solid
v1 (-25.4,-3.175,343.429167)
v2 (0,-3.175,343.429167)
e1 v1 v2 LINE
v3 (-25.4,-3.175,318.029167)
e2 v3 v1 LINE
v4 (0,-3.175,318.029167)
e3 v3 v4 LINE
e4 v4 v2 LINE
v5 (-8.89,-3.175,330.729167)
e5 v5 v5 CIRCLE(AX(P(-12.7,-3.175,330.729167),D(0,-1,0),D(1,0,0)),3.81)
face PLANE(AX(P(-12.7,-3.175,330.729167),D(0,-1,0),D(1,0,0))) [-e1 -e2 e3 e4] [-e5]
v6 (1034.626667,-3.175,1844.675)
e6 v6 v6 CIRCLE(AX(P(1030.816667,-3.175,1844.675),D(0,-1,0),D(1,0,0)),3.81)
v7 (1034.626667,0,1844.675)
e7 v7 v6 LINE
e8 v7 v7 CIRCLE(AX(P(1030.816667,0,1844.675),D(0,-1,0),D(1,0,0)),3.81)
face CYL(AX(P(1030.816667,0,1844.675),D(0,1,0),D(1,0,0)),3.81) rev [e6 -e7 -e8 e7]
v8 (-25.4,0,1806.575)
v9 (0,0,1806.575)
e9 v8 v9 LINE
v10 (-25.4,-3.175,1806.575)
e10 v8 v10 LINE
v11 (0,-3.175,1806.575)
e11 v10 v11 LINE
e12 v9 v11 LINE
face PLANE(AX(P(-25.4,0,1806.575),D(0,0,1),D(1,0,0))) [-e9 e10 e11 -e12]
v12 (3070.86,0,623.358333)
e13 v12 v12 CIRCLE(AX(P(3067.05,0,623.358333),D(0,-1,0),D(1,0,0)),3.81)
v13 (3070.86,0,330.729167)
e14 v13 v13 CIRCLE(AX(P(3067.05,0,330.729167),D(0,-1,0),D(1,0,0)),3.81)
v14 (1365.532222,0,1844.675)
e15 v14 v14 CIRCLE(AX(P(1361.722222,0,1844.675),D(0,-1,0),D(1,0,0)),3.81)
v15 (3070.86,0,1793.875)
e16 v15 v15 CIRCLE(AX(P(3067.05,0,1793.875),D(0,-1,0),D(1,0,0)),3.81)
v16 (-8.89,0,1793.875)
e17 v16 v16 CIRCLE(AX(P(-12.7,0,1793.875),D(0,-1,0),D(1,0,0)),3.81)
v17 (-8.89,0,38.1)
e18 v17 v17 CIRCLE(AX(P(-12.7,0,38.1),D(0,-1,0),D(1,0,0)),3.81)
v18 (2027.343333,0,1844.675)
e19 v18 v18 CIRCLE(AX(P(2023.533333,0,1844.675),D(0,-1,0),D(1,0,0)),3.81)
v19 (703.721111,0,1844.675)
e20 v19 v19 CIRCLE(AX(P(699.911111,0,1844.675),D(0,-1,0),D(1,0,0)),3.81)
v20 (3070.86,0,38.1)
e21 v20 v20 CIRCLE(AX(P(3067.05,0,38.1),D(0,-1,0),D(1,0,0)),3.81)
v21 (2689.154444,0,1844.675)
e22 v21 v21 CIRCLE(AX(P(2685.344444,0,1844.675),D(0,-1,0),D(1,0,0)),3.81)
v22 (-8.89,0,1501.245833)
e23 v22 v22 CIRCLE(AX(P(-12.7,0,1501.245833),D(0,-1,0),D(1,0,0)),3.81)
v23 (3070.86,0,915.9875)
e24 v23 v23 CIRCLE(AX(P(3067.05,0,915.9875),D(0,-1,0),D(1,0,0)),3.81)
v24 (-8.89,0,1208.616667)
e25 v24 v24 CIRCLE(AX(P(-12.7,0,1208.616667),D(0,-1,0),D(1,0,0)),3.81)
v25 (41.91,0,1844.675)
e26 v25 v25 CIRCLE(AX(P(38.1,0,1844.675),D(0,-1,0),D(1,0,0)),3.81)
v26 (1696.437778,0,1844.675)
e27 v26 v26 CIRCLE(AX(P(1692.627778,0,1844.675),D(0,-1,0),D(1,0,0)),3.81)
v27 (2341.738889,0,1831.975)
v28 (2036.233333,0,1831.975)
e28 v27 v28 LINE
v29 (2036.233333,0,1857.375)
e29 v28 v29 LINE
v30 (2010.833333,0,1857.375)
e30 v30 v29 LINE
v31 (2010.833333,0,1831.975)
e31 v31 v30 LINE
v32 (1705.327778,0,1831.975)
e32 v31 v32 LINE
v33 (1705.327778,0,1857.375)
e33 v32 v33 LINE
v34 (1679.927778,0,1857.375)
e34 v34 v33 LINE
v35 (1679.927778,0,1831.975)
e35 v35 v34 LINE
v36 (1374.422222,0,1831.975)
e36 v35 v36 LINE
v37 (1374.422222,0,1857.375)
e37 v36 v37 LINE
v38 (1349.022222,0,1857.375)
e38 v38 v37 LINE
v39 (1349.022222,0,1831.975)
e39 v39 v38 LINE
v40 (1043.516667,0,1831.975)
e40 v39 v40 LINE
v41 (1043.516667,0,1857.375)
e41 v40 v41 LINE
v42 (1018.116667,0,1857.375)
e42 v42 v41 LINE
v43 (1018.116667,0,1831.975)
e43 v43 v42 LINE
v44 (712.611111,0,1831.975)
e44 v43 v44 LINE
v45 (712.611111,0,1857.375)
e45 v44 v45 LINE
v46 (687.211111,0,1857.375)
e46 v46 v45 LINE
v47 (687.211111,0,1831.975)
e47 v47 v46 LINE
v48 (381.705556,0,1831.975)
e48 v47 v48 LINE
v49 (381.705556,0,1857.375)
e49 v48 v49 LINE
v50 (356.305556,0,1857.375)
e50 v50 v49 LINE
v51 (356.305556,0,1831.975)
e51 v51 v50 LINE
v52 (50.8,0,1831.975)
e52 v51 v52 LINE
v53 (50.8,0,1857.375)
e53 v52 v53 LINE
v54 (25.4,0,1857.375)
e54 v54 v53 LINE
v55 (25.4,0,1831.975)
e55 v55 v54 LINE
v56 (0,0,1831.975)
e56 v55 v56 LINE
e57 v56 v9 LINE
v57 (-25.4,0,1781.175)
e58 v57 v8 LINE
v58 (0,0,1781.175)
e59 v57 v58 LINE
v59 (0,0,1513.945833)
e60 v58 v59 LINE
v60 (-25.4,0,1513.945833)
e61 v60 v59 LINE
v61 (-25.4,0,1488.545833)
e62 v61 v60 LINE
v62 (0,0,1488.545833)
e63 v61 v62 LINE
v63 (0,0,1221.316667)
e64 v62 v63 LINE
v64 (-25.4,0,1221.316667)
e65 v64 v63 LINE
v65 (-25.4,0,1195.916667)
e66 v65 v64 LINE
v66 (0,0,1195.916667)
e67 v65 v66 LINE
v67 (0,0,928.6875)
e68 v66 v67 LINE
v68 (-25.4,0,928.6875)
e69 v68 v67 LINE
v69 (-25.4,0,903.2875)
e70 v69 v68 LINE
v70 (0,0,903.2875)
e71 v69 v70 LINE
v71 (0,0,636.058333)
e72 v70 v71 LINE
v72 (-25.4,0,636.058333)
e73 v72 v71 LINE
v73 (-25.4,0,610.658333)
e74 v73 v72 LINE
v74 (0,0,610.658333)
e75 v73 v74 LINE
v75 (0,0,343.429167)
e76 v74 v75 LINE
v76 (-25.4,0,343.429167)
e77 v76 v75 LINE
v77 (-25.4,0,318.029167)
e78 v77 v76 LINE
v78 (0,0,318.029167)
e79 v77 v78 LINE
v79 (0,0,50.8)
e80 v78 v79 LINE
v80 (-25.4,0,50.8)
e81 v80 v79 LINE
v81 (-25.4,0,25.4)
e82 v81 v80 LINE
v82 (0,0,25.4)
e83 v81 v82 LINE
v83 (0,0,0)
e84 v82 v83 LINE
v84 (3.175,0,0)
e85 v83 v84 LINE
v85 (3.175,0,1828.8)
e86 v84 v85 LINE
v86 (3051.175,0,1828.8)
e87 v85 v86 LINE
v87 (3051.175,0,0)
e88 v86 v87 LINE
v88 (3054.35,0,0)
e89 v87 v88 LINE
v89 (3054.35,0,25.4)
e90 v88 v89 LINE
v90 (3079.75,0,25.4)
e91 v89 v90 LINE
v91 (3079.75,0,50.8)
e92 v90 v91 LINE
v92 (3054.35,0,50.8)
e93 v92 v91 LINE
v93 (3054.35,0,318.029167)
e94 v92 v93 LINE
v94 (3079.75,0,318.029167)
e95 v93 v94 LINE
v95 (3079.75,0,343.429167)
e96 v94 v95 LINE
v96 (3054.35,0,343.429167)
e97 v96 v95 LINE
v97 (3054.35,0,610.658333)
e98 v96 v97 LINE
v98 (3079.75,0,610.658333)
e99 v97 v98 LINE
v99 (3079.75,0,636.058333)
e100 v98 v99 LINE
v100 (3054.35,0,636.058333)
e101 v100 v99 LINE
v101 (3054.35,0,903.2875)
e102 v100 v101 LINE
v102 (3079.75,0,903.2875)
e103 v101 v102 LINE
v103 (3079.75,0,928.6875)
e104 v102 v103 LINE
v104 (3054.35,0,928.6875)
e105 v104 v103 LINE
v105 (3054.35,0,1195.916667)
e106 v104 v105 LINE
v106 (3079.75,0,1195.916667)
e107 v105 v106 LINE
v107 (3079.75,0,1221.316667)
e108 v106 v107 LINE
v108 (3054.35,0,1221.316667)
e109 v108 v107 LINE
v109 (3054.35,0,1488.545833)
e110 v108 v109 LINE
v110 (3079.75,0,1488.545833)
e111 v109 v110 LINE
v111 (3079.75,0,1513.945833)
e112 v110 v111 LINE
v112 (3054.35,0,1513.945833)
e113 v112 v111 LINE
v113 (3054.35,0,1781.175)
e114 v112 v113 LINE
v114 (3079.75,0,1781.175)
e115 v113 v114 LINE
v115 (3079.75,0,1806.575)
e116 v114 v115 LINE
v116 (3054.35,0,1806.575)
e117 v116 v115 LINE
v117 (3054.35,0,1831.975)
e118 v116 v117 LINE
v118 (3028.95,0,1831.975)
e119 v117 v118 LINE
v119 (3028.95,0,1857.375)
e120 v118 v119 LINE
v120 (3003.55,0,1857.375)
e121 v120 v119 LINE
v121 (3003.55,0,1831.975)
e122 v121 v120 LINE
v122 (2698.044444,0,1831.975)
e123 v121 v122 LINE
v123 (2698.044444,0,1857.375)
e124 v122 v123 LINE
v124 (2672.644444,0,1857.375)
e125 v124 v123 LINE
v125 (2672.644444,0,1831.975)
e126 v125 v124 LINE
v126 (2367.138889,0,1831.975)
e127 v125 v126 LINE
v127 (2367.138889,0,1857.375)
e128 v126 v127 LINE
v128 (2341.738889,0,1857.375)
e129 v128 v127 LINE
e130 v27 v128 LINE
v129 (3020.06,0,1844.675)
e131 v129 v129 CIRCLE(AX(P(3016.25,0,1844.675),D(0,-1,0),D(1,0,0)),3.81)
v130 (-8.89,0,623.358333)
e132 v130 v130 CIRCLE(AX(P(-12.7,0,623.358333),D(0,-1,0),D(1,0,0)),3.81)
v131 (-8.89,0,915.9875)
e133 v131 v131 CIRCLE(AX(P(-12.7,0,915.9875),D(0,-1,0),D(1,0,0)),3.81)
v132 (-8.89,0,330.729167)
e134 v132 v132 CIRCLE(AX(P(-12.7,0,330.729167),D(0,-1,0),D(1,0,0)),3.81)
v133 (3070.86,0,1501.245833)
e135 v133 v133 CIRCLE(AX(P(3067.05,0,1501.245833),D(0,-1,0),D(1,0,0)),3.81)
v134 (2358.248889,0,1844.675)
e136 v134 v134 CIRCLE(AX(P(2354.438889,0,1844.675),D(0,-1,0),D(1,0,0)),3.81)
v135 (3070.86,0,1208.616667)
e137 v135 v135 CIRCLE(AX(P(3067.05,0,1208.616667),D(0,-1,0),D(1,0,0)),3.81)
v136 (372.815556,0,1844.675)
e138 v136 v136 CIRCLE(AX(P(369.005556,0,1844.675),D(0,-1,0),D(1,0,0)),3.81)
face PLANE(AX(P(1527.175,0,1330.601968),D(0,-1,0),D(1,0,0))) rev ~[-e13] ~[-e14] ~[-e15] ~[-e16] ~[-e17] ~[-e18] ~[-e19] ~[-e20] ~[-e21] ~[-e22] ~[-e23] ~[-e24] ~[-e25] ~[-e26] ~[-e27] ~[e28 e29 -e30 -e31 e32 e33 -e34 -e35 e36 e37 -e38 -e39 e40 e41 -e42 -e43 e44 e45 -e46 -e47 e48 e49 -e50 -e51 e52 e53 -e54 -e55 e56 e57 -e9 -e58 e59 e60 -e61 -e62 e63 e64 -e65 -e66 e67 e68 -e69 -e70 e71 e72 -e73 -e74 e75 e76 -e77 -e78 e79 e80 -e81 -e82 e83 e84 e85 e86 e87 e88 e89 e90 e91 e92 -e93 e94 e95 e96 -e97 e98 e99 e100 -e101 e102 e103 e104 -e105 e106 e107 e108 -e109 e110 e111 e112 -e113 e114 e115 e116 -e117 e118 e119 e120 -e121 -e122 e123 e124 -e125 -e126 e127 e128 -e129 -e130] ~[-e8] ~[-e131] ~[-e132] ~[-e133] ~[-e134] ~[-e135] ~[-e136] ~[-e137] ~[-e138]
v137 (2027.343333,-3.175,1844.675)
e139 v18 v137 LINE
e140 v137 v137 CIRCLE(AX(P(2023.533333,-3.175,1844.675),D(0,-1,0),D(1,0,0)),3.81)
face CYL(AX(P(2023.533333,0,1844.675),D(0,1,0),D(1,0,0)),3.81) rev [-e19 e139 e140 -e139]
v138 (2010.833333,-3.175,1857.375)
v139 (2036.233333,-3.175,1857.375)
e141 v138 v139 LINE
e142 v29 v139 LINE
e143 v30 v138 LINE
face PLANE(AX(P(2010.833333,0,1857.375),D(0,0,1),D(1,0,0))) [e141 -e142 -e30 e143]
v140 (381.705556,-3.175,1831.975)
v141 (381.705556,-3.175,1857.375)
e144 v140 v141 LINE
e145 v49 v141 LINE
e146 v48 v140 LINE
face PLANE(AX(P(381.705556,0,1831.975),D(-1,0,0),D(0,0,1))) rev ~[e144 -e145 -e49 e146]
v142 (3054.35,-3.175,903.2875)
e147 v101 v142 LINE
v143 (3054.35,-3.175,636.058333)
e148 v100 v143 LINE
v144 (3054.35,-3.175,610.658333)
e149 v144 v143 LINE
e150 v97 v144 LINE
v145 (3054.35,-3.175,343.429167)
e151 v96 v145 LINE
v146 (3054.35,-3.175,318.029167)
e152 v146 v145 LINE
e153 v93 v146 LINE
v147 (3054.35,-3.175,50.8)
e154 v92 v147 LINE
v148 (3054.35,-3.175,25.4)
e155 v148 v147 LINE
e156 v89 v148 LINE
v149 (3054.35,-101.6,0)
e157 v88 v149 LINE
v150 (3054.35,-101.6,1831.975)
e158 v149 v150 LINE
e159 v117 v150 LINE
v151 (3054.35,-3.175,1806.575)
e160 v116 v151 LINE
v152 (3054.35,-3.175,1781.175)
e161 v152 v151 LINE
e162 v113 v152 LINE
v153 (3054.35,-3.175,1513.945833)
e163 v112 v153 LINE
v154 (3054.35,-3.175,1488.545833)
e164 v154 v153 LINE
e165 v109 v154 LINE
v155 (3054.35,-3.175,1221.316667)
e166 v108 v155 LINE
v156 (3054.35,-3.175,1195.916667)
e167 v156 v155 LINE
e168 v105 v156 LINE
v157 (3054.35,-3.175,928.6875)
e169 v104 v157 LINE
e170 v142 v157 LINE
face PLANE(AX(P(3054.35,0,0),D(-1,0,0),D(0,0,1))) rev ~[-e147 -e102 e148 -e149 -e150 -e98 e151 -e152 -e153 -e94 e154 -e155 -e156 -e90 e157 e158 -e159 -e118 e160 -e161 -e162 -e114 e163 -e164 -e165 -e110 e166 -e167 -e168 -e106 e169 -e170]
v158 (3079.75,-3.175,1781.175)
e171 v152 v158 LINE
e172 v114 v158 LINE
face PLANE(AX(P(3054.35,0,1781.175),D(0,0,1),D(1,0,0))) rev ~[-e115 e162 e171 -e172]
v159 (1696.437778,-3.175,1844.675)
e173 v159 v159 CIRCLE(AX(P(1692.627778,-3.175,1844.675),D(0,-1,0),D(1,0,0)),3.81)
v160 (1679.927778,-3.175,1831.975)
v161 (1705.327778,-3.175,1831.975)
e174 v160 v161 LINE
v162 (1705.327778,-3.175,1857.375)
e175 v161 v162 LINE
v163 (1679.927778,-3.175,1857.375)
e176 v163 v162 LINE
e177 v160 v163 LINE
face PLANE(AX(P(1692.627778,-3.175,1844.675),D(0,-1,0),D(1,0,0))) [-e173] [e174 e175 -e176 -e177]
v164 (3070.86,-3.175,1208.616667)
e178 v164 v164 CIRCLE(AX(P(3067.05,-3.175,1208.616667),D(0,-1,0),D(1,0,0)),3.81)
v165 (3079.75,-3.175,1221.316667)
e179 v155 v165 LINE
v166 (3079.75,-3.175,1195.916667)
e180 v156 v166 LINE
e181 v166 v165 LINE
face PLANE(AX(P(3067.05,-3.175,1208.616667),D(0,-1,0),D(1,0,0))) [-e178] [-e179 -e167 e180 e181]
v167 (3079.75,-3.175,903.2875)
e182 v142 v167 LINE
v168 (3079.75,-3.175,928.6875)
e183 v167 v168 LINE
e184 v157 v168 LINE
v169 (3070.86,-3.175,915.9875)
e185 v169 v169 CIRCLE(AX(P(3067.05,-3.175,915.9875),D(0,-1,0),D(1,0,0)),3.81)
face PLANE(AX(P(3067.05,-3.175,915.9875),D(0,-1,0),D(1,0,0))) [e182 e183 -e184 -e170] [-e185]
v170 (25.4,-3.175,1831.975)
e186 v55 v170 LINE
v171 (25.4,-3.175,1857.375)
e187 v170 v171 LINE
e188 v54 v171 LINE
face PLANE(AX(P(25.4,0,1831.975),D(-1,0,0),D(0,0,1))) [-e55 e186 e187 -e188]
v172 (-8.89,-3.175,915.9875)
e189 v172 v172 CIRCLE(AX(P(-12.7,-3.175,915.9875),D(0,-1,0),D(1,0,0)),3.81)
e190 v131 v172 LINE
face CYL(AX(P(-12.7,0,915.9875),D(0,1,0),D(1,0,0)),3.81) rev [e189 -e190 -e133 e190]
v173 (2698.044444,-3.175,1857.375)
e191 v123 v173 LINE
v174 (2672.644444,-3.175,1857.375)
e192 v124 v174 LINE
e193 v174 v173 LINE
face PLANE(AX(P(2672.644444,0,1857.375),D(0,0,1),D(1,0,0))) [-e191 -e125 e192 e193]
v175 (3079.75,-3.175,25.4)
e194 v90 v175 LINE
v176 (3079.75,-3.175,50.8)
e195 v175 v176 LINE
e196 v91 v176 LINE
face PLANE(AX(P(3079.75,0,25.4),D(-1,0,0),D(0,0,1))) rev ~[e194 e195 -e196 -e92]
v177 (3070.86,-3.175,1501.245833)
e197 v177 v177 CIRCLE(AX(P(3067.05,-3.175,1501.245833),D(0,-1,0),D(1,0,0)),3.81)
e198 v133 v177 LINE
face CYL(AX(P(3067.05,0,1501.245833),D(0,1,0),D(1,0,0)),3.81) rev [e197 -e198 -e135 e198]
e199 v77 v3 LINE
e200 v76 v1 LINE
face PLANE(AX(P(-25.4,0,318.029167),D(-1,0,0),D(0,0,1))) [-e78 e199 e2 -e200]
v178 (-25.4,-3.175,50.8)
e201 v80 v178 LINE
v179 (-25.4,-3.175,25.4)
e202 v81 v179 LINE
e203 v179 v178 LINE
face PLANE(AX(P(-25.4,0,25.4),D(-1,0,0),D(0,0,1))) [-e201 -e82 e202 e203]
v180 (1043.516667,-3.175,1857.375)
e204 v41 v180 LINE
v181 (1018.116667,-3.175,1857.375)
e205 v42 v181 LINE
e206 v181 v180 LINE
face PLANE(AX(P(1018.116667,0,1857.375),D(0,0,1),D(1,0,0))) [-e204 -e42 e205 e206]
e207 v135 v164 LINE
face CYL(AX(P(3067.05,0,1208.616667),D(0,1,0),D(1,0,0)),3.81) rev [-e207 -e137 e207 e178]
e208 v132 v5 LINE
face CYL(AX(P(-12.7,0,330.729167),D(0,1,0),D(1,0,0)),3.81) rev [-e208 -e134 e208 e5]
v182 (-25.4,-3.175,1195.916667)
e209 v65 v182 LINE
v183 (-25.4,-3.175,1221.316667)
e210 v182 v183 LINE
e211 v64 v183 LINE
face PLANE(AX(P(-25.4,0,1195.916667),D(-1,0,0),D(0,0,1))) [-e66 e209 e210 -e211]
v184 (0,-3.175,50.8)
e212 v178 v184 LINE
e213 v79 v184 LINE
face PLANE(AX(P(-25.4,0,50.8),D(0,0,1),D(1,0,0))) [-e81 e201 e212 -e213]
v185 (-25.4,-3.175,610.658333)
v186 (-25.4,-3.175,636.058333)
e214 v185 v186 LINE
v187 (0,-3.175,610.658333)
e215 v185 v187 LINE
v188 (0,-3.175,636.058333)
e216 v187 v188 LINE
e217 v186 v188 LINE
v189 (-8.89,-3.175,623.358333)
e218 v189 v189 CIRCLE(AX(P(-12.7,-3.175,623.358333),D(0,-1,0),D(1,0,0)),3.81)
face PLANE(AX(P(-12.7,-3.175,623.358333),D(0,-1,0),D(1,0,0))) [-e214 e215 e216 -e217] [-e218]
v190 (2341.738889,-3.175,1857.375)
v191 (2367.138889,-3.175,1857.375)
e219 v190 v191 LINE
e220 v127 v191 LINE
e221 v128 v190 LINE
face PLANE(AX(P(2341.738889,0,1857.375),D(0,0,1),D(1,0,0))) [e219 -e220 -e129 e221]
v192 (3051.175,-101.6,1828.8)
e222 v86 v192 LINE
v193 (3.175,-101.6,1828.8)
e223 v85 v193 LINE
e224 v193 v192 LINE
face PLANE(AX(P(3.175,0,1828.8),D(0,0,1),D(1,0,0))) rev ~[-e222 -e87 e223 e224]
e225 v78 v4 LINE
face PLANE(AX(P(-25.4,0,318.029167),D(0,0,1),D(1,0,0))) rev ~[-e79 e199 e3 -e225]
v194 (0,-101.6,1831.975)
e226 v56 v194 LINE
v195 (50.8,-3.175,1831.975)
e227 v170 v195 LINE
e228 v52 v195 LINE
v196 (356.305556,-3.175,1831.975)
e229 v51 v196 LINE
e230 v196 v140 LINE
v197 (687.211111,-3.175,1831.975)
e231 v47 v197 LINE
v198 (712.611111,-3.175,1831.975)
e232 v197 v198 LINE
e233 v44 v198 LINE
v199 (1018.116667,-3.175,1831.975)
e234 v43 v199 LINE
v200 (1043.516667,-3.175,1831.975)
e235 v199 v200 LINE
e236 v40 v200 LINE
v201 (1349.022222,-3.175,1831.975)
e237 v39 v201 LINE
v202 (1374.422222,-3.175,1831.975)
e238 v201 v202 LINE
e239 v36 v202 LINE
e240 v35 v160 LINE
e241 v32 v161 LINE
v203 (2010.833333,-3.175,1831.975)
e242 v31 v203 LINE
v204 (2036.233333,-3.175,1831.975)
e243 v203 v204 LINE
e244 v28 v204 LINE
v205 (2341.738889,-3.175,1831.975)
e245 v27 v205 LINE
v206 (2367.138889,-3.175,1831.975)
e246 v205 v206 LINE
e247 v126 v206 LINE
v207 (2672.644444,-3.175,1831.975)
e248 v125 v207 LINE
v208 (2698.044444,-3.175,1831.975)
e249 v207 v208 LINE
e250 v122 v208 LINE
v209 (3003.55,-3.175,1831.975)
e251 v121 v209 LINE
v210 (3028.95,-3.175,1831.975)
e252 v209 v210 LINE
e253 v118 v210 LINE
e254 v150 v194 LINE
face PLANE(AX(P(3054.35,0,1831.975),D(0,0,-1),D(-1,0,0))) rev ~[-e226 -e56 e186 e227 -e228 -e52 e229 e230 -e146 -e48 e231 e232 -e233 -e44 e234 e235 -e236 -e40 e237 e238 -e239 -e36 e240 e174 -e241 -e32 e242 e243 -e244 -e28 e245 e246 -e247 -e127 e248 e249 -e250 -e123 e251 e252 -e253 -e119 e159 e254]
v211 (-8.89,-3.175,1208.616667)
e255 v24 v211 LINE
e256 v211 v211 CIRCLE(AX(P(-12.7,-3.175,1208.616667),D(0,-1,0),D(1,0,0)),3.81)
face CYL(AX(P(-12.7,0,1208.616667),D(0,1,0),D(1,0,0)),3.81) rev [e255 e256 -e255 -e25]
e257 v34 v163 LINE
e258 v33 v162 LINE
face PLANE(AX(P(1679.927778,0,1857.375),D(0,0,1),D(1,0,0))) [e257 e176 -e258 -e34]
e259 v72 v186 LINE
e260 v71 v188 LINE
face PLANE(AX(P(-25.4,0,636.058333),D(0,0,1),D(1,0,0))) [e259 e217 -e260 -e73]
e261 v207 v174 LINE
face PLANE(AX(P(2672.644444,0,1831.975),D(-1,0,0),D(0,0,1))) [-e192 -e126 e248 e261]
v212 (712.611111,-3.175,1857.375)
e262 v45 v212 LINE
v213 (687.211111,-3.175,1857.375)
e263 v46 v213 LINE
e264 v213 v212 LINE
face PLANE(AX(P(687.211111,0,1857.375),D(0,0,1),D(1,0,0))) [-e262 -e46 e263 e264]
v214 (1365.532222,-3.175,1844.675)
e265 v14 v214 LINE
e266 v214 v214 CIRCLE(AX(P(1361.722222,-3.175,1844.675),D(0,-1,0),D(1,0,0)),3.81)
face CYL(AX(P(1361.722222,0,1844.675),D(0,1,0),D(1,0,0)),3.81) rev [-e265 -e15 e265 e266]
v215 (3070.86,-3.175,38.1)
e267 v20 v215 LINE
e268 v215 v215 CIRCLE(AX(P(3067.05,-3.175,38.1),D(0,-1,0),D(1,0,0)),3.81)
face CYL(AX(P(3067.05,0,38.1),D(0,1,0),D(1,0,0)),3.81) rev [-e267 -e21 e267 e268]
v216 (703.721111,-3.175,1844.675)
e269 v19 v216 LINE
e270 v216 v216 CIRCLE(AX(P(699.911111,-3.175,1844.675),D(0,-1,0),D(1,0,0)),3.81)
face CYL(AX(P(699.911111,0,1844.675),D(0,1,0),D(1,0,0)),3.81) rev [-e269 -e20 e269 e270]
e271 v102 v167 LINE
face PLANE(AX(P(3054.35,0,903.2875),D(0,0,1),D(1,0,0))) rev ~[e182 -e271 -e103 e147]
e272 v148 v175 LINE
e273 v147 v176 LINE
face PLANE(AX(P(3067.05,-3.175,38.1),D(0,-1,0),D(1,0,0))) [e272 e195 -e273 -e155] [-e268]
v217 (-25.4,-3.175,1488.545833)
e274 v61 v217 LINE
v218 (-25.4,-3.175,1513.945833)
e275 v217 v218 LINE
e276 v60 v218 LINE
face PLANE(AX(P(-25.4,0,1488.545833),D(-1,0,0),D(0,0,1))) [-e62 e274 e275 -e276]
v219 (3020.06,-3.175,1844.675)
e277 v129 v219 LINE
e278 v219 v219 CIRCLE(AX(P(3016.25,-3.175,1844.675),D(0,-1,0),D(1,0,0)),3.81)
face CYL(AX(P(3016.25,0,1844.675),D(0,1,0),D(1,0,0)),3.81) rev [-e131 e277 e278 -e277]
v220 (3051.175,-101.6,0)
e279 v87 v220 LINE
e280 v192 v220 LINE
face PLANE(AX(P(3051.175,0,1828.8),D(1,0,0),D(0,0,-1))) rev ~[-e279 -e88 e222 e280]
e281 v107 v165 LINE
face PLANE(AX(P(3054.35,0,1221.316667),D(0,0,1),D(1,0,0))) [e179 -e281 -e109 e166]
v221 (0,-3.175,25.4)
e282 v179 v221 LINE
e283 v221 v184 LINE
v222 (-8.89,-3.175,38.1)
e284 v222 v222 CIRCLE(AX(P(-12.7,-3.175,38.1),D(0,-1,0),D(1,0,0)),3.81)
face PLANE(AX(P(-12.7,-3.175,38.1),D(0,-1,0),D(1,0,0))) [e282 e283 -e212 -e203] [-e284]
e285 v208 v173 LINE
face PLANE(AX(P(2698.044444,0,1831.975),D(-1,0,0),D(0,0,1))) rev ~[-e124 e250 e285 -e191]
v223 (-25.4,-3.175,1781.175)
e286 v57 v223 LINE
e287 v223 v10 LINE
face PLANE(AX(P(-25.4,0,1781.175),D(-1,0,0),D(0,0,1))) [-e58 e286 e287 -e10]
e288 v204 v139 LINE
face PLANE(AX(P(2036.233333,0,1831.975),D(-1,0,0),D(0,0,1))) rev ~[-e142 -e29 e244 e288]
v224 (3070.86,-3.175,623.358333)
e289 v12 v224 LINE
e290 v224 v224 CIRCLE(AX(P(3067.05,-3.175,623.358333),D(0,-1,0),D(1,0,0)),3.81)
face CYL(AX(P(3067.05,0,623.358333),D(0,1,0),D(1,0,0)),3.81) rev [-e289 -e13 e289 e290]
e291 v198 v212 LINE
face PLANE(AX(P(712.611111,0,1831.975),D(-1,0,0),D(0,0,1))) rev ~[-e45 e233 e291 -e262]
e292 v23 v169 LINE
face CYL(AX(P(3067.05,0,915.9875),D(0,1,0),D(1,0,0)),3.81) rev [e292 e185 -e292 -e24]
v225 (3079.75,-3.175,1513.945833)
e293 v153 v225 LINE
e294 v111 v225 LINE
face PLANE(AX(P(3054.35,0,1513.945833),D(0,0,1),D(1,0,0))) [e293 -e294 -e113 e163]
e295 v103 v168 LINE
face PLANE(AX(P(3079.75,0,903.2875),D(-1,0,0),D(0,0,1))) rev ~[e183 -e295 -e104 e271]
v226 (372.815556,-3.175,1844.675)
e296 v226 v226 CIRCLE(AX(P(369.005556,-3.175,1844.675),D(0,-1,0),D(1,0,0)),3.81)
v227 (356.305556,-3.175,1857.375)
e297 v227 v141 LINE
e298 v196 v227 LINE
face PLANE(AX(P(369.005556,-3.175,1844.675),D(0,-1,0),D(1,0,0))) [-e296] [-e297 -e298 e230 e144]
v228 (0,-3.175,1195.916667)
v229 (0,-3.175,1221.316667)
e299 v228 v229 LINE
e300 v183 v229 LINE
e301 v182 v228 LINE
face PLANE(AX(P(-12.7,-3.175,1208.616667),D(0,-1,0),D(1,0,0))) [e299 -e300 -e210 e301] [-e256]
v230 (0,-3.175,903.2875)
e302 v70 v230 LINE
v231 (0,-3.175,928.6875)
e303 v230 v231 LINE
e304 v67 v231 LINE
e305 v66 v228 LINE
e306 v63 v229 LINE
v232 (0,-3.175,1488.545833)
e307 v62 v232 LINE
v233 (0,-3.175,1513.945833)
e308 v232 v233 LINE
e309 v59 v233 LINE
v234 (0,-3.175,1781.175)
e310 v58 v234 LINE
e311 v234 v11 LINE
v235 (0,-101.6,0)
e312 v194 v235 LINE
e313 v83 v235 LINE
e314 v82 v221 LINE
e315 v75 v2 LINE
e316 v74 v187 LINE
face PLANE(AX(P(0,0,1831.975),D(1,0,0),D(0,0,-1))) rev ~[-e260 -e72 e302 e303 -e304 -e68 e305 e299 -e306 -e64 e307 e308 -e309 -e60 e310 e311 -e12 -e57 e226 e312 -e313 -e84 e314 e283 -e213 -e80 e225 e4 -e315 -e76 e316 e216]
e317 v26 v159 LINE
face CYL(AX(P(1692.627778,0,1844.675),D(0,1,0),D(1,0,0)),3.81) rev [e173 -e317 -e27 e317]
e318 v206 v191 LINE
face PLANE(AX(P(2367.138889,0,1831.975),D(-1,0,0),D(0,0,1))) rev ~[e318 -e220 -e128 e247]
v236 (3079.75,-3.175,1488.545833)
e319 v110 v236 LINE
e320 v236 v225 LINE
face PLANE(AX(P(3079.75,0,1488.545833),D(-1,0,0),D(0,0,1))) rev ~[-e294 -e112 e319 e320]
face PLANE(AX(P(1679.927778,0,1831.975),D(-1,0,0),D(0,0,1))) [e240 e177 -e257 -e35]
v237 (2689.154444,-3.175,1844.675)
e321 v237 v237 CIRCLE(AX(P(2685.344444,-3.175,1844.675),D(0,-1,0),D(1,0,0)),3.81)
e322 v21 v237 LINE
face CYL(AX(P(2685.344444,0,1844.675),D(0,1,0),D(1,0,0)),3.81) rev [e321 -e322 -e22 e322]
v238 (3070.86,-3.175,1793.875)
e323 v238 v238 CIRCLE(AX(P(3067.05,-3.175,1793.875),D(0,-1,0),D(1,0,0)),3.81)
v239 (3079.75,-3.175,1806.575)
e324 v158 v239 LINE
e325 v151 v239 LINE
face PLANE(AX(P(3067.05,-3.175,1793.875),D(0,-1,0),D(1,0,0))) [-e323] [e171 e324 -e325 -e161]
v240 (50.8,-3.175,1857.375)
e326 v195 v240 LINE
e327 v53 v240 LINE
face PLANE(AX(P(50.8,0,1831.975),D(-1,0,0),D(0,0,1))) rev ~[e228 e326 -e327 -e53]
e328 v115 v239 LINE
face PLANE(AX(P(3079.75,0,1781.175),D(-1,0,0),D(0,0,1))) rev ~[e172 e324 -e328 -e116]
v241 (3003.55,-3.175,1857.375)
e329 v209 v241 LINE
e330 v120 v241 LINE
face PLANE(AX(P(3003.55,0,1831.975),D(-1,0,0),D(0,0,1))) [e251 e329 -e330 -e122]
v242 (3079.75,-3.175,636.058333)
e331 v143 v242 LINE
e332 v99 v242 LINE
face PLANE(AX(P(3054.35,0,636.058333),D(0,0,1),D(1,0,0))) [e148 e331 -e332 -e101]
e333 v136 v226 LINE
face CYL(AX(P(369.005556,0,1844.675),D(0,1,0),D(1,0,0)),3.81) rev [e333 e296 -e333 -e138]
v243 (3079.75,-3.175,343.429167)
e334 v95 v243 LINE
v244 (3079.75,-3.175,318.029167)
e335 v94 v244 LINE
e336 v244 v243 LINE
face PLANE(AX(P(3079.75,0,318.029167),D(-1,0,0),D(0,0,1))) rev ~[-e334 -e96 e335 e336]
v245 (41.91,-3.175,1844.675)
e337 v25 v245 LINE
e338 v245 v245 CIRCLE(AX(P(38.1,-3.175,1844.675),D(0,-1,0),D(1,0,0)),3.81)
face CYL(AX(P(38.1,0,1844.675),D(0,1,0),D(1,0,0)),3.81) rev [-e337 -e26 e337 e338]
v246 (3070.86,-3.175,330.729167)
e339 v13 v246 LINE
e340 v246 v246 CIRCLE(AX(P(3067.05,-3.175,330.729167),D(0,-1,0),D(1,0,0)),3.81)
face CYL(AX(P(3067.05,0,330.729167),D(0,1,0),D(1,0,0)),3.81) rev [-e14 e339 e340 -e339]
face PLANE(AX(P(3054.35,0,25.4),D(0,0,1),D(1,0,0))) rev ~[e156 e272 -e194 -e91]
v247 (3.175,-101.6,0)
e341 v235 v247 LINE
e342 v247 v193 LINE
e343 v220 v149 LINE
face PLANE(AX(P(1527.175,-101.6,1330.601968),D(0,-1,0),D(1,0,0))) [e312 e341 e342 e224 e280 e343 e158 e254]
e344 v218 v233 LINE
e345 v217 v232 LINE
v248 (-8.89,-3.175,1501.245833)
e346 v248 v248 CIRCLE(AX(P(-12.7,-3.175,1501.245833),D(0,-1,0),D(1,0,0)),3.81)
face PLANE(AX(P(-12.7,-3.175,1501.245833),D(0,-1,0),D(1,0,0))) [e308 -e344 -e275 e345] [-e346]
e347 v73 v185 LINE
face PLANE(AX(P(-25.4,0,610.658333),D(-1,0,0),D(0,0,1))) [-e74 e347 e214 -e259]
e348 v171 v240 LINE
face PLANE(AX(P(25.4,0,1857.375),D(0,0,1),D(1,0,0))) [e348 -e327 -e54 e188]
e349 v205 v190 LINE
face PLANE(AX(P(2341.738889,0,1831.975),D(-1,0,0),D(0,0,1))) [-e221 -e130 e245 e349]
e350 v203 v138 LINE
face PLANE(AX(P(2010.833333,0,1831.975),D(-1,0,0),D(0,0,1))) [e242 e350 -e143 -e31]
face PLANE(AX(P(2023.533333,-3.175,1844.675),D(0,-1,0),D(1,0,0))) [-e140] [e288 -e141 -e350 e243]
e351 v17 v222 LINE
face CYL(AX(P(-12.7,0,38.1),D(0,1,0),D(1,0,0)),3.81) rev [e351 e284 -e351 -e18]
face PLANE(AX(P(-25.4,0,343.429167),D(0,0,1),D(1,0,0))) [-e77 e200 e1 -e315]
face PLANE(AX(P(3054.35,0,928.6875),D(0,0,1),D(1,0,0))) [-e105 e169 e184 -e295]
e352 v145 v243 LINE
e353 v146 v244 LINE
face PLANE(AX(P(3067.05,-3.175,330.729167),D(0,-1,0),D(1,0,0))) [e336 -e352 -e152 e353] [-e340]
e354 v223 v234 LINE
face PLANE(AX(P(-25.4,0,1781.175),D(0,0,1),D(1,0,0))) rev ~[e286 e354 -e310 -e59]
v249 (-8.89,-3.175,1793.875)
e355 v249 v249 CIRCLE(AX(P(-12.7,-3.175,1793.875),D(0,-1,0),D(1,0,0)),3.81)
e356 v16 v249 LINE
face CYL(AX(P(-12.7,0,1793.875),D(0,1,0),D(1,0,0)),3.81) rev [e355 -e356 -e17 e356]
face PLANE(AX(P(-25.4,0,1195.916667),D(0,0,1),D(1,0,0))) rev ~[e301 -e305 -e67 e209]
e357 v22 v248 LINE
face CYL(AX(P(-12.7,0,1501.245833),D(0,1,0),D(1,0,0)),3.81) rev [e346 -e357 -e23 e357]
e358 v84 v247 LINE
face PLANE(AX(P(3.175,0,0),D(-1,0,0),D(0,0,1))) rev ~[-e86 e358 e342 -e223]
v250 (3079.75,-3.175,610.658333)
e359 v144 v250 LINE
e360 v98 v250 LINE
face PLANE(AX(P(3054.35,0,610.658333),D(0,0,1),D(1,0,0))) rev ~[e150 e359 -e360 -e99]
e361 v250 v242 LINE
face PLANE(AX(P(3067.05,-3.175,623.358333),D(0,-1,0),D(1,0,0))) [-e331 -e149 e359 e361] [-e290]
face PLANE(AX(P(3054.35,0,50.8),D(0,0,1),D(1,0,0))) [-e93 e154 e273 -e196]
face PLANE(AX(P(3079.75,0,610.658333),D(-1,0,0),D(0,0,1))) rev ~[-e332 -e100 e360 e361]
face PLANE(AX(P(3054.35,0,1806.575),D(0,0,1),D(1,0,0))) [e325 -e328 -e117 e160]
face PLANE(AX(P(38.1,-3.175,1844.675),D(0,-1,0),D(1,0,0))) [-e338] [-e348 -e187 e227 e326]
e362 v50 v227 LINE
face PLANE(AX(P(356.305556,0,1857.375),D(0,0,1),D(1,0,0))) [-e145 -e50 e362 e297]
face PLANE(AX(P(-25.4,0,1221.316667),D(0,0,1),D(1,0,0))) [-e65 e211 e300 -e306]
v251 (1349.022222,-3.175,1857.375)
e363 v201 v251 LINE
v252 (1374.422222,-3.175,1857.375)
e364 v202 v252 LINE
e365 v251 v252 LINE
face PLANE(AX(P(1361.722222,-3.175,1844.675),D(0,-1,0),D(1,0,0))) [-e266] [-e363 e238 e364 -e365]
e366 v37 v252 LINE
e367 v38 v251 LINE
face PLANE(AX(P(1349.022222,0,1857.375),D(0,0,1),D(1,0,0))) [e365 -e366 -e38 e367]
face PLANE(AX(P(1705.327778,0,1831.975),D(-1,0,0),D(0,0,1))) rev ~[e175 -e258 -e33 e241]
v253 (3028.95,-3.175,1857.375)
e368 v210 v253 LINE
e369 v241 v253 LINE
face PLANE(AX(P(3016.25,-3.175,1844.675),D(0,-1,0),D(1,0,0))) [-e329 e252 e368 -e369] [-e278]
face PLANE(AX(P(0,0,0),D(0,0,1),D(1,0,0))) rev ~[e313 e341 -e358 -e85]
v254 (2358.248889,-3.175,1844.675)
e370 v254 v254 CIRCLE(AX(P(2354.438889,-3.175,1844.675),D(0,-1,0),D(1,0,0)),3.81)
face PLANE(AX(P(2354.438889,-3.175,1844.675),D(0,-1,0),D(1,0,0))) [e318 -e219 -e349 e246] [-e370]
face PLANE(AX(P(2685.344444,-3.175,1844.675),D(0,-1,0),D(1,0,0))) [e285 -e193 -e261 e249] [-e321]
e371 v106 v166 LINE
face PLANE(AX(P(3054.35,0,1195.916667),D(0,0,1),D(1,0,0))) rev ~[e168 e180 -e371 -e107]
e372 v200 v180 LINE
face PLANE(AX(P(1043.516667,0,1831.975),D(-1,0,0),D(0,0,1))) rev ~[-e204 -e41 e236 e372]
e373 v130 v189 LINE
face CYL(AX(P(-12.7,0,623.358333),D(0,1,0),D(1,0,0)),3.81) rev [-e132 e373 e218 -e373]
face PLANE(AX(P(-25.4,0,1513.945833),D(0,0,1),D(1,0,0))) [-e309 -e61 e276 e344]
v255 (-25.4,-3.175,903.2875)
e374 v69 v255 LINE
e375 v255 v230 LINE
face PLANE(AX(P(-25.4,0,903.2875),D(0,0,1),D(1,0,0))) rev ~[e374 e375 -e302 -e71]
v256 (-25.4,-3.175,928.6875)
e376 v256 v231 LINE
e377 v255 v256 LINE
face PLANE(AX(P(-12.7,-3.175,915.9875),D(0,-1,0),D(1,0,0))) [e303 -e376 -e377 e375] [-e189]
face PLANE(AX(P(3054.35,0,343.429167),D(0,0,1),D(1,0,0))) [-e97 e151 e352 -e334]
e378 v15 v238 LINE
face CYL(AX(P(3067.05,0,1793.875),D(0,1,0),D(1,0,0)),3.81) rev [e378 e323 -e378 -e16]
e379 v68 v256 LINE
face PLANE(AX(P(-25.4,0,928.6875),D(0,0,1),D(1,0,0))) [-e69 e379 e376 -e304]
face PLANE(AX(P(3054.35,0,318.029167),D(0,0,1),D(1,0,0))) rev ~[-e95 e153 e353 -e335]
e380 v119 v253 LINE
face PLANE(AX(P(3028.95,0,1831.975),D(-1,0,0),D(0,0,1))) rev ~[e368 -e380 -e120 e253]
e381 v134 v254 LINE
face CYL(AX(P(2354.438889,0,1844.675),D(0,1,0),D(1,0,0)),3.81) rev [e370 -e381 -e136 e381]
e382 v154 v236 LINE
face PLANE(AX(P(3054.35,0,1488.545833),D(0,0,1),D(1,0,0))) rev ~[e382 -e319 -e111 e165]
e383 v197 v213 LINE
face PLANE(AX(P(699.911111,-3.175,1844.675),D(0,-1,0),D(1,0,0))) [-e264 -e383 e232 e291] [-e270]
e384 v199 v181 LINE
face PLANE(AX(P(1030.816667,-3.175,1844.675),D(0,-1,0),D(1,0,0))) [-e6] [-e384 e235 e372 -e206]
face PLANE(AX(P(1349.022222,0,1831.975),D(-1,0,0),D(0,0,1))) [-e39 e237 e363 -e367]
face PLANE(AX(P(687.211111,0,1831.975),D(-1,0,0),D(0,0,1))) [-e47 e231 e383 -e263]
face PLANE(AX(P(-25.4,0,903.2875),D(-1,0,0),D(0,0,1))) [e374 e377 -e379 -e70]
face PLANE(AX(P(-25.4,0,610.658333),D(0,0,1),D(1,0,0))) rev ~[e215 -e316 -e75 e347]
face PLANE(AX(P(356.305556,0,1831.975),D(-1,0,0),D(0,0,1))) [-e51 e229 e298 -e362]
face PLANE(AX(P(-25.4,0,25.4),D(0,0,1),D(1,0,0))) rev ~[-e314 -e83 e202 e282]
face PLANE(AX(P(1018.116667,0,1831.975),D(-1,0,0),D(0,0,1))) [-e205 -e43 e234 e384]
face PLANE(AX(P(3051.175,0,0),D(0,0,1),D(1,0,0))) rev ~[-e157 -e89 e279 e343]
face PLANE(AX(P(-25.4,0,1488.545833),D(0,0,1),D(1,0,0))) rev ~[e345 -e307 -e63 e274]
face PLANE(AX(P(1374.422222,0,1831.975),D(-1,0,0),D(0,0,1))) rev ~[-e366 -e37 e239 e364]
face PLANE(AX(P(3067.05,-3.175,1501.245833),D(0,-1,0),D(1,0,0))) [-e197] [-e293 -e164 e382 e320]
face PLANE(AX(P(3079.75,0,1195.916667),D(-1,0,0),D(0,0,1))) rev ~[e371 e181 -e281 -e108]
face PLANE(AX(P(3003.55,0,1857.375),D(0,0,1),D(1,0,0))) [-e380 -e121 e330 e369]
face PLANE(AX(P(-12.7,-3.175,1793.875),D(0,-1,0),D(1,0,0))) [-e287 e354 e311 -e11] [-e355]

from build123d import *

# Parameters (mm, degrees)
F1_DEPTH = 101.6
F0_W     = 25.4
F0_H     = 25.4
F0_R     = 3.81
F2_DEPTH = 3.175


# Not quite as in the source:
# - a feature names something its author has since deleted; it is built from what else it names


with BuildPart() as f1:
    # F0 (on Front) → F1 (new body)
    with BuildSketch(Plane.XZ):
        Polygon((0, 25.4), (0, 0), (3.175, 0), (3.175, 1828.8), (3051.175, 1828.8), (3051.175, 0), (3054.35, 0), (3054.35, 25.4), (3054.35, 50.8), (3054.35, 318.0291666667), (3054.35, 343.4291666667), (3054.35, 610.6583333333), (3054.35, 636.0583333333), (3054.35, 903.2875), (3054.35, 928.6875), (3054.35, 1195.9166666667), (3054.35, 1221.3166666667), (3054.35, 1488.5458333333), (3054.35, 1513.9458333333), (3054.35, 1781.175), (3054.35, 1806.575), (3054.35, 1831.975), (3028.95, 1831.975), (3003.55, 1831.975), (2698.0444444444, 1831.975), (2672.6444444444, 1831.975), (2367.1388888889, 1831.975), (2341.7388888889, 1831.975), (2036.2333333333, 1831.975), (2010.8333333333, 1831.975), (1705.3277777778, 1831.975), (1679.9277777778, 1831.975), (1374.4222222222, 1831.975), (1349.0222222222, 1831.975), (1043.5166666667, 1831.975), (1018.1166666667, 1831.975), (712.6111111111, 1831.975), (687.2111111111, 1831.975), (381.7055555556, 1831.975), (356.3055555556, 1831.975), (50.8, 1831.975), (25.4, 1831.975), (0, 1831.975), (0, 1806.575), (0, 1781.175), (0, 1513.9458333333), (0, 1488.5458333333), (0, 1221.3166666667), (0, 1195.9166666667), (0, 928.6875), (0, 903.2875), (0, 636.0583333333), (0, 610.6583333333), (0, 343.4291666667), (0, 318.0291666667), (0, 50.8), align=None)
    extrude(amount=F1_DEPTH)

    # F0 (on Front) → F2 (join)
    with BuildSketch(Plane.XZ):
        with Locations((-12.7, 38.1)):
            Rectangle(F0_W, F0_H)
        with Locations((-12.7, 38.1)):
            Circle(F0_R, mode=Mode.SUBTRACT)
        with Locations((-12.7, 330.7291666667)):
            Rectangle(F0_W, F0_H)
        with Locations((-12.7, 330.7291666667)):
            Circle(F0_R, mode=Mode.SUBTRACT)
        with Locations((-12.7, 623.3583333333)):
            Rectangle(F0_W, F0_H)
        with Locations((-12.7, 623.3583333333)):
            Circle(F0_R, mode=Mode.SUBTRACT)
        with Locations((3067.05, 38.1)):
            Rectangle(F0_W, F0_H)
        with Locations((3067.05, 38.1)):
            Circle(F0_R, mode=Mode.SUBTRACT)
        with Locations((-12.7, 915.9875)):
            Rectangle(F0_W, F0_H)
        with Locations((-12.7, 915.9875)):
            Circle(F0_R, mode=Mode.SUBTRACT)
        with Locations((3067.05, 330.7291666667)):
            Rectangle(F0_W, F0_H)
        with Locations((3067.05, 330.7291666667)):
            Circle(F0_R, mode=Mode.SUBTRACT)
        with Locations((-12.7, 1208.6166666667)):
            Rectangle(F0_W, F0_H)
        with Locations((-12.7, 1208.6166666667)):
            Circle(F0_R, mode=Mode.SUBTRACT)
        with Locations((3067.05, 623.3583333333)):
            Rectangle(F0_W, F0_H)
        with Locations((3067.05, 623.3583333333)):
            Circle(F0_R, mode=Mode.SUBTRACT)
        with Locations((-12.7, 1501.2458333333)):
            Rectangle(F0_W, F0_H)
        with Locations((-12.7, 1501.2458333333)):
            Circle(F0_R, mode=Mode.SUBTRACT)
        with Locations((3067.05, 915.9875)):
            Rectangle(F0_W, F0_H)
        with Locations((3067.05, 915.9875)):
            Circle(F0_R, mode=Mode.SUBTRACT)
        with Locations((-12.7, 1793.875)):
            Rectangle(F0_W, F0_H)
        with Locations((-12.7, 1793.875)):
            Circle(F0_R, mode=Mode.SUBTRACT)
        with Locations((3067.05, 1208.6166666667)):
            Rectangle(F0_W, F0_H)
        with Locations((3067.05, 1208.6166666667)):
            Circle(F0_R, mode=Mode.SUBTRACT)
        with Locations((38.1, 1844.675)):
            Rectangle(F0_W, F0_H)
        with Locations((38.1, 1844.675)):
            Circle(F0_R, mode=Mode.SUBTRACT)
        with Locations((3067.05, 1501.2458333333)):
            Rectangle(F0_W, F0_H)
        with Locations((3067.05, 1501.2458333333)):
            Circle(F0_R, mode=Mode.SUBTRACT)
        with Locations((369.0055555556, 1844.675)):
            Rectangle(F0_W, F0_H)
        with Locations((369.0055555556, 1844.675)):
            Circle(F0_R, mode=Mode.SUBTRACT)
        with Locations((3067.05, 1793.875)):
            Rectangle(F0_W, F0_H)
        with Locations((3067.05, 1793.875)):
            Circle(F0_R, mode=Mode.SUBTRACT)
        with Locations((699.9111111111, 1844.675)):
            Rectangle(F0_W, F0_H)
        with Locations((699.9111111111, 1844.675)):
            Circle(F0_R, mode=Mode.SUBTRACT)
        with Locations((3016.25, 1844.675)):
            Rectangle(F0_W, F0_H)
        with Locations((3016.25, 1844.675)):
            Circle(F0_R, mode=Mode.SUBTRACT)
        with Locations((1030.8166666667, 1844.675)):
            Rectangle(F0_W, F0_H)
        with Locations((1030.8166666667, 1844.675)):
            Circle(F0_R, mode=Mode.SUBTRACT)
        with Locations((2685.3444444444, 1844.675)):
            Rectangle(F0_W, F0_H)
        with Locations((2685.3444444444, 1844.675)):
            Circle(F0_R, mode=Mode.SUBTRACT)
        with Locations((1361.7222222222, 1844.675)):
            Rectangle(F0_W, F0_H)
        with Locations((1361.7222222222, 1844.675)):
            Circle(F0_R, mode=Mode.SUBTRACT)
        with Locations((2354.4388888889, 1844.675)):
            Rectangle(F0_W, F0_H)
        with Locations((2354.4388888889, 1844.675)):
            Circle(F0_R, mode=Mode.SUBTRACT)
        with Locations((1692.6277777778, 1844.675)):
            Rectangle(F0_W, F0_H)
        with Locations((1692.6277777778, 1844.675)):
            Circle(F0_R, mode=Mode.SUBTRACT)
        with Locations((2023.5333333333, 1844.675)):
            Rectangle(F0_W, F0_H)
        with Locations((2023.5333333333, 1844.675)):
            Circle(F0_R, mode=Mode.SUBTRACT)
    extrude(amount=F2_DEPTH)


solid = f1.part
